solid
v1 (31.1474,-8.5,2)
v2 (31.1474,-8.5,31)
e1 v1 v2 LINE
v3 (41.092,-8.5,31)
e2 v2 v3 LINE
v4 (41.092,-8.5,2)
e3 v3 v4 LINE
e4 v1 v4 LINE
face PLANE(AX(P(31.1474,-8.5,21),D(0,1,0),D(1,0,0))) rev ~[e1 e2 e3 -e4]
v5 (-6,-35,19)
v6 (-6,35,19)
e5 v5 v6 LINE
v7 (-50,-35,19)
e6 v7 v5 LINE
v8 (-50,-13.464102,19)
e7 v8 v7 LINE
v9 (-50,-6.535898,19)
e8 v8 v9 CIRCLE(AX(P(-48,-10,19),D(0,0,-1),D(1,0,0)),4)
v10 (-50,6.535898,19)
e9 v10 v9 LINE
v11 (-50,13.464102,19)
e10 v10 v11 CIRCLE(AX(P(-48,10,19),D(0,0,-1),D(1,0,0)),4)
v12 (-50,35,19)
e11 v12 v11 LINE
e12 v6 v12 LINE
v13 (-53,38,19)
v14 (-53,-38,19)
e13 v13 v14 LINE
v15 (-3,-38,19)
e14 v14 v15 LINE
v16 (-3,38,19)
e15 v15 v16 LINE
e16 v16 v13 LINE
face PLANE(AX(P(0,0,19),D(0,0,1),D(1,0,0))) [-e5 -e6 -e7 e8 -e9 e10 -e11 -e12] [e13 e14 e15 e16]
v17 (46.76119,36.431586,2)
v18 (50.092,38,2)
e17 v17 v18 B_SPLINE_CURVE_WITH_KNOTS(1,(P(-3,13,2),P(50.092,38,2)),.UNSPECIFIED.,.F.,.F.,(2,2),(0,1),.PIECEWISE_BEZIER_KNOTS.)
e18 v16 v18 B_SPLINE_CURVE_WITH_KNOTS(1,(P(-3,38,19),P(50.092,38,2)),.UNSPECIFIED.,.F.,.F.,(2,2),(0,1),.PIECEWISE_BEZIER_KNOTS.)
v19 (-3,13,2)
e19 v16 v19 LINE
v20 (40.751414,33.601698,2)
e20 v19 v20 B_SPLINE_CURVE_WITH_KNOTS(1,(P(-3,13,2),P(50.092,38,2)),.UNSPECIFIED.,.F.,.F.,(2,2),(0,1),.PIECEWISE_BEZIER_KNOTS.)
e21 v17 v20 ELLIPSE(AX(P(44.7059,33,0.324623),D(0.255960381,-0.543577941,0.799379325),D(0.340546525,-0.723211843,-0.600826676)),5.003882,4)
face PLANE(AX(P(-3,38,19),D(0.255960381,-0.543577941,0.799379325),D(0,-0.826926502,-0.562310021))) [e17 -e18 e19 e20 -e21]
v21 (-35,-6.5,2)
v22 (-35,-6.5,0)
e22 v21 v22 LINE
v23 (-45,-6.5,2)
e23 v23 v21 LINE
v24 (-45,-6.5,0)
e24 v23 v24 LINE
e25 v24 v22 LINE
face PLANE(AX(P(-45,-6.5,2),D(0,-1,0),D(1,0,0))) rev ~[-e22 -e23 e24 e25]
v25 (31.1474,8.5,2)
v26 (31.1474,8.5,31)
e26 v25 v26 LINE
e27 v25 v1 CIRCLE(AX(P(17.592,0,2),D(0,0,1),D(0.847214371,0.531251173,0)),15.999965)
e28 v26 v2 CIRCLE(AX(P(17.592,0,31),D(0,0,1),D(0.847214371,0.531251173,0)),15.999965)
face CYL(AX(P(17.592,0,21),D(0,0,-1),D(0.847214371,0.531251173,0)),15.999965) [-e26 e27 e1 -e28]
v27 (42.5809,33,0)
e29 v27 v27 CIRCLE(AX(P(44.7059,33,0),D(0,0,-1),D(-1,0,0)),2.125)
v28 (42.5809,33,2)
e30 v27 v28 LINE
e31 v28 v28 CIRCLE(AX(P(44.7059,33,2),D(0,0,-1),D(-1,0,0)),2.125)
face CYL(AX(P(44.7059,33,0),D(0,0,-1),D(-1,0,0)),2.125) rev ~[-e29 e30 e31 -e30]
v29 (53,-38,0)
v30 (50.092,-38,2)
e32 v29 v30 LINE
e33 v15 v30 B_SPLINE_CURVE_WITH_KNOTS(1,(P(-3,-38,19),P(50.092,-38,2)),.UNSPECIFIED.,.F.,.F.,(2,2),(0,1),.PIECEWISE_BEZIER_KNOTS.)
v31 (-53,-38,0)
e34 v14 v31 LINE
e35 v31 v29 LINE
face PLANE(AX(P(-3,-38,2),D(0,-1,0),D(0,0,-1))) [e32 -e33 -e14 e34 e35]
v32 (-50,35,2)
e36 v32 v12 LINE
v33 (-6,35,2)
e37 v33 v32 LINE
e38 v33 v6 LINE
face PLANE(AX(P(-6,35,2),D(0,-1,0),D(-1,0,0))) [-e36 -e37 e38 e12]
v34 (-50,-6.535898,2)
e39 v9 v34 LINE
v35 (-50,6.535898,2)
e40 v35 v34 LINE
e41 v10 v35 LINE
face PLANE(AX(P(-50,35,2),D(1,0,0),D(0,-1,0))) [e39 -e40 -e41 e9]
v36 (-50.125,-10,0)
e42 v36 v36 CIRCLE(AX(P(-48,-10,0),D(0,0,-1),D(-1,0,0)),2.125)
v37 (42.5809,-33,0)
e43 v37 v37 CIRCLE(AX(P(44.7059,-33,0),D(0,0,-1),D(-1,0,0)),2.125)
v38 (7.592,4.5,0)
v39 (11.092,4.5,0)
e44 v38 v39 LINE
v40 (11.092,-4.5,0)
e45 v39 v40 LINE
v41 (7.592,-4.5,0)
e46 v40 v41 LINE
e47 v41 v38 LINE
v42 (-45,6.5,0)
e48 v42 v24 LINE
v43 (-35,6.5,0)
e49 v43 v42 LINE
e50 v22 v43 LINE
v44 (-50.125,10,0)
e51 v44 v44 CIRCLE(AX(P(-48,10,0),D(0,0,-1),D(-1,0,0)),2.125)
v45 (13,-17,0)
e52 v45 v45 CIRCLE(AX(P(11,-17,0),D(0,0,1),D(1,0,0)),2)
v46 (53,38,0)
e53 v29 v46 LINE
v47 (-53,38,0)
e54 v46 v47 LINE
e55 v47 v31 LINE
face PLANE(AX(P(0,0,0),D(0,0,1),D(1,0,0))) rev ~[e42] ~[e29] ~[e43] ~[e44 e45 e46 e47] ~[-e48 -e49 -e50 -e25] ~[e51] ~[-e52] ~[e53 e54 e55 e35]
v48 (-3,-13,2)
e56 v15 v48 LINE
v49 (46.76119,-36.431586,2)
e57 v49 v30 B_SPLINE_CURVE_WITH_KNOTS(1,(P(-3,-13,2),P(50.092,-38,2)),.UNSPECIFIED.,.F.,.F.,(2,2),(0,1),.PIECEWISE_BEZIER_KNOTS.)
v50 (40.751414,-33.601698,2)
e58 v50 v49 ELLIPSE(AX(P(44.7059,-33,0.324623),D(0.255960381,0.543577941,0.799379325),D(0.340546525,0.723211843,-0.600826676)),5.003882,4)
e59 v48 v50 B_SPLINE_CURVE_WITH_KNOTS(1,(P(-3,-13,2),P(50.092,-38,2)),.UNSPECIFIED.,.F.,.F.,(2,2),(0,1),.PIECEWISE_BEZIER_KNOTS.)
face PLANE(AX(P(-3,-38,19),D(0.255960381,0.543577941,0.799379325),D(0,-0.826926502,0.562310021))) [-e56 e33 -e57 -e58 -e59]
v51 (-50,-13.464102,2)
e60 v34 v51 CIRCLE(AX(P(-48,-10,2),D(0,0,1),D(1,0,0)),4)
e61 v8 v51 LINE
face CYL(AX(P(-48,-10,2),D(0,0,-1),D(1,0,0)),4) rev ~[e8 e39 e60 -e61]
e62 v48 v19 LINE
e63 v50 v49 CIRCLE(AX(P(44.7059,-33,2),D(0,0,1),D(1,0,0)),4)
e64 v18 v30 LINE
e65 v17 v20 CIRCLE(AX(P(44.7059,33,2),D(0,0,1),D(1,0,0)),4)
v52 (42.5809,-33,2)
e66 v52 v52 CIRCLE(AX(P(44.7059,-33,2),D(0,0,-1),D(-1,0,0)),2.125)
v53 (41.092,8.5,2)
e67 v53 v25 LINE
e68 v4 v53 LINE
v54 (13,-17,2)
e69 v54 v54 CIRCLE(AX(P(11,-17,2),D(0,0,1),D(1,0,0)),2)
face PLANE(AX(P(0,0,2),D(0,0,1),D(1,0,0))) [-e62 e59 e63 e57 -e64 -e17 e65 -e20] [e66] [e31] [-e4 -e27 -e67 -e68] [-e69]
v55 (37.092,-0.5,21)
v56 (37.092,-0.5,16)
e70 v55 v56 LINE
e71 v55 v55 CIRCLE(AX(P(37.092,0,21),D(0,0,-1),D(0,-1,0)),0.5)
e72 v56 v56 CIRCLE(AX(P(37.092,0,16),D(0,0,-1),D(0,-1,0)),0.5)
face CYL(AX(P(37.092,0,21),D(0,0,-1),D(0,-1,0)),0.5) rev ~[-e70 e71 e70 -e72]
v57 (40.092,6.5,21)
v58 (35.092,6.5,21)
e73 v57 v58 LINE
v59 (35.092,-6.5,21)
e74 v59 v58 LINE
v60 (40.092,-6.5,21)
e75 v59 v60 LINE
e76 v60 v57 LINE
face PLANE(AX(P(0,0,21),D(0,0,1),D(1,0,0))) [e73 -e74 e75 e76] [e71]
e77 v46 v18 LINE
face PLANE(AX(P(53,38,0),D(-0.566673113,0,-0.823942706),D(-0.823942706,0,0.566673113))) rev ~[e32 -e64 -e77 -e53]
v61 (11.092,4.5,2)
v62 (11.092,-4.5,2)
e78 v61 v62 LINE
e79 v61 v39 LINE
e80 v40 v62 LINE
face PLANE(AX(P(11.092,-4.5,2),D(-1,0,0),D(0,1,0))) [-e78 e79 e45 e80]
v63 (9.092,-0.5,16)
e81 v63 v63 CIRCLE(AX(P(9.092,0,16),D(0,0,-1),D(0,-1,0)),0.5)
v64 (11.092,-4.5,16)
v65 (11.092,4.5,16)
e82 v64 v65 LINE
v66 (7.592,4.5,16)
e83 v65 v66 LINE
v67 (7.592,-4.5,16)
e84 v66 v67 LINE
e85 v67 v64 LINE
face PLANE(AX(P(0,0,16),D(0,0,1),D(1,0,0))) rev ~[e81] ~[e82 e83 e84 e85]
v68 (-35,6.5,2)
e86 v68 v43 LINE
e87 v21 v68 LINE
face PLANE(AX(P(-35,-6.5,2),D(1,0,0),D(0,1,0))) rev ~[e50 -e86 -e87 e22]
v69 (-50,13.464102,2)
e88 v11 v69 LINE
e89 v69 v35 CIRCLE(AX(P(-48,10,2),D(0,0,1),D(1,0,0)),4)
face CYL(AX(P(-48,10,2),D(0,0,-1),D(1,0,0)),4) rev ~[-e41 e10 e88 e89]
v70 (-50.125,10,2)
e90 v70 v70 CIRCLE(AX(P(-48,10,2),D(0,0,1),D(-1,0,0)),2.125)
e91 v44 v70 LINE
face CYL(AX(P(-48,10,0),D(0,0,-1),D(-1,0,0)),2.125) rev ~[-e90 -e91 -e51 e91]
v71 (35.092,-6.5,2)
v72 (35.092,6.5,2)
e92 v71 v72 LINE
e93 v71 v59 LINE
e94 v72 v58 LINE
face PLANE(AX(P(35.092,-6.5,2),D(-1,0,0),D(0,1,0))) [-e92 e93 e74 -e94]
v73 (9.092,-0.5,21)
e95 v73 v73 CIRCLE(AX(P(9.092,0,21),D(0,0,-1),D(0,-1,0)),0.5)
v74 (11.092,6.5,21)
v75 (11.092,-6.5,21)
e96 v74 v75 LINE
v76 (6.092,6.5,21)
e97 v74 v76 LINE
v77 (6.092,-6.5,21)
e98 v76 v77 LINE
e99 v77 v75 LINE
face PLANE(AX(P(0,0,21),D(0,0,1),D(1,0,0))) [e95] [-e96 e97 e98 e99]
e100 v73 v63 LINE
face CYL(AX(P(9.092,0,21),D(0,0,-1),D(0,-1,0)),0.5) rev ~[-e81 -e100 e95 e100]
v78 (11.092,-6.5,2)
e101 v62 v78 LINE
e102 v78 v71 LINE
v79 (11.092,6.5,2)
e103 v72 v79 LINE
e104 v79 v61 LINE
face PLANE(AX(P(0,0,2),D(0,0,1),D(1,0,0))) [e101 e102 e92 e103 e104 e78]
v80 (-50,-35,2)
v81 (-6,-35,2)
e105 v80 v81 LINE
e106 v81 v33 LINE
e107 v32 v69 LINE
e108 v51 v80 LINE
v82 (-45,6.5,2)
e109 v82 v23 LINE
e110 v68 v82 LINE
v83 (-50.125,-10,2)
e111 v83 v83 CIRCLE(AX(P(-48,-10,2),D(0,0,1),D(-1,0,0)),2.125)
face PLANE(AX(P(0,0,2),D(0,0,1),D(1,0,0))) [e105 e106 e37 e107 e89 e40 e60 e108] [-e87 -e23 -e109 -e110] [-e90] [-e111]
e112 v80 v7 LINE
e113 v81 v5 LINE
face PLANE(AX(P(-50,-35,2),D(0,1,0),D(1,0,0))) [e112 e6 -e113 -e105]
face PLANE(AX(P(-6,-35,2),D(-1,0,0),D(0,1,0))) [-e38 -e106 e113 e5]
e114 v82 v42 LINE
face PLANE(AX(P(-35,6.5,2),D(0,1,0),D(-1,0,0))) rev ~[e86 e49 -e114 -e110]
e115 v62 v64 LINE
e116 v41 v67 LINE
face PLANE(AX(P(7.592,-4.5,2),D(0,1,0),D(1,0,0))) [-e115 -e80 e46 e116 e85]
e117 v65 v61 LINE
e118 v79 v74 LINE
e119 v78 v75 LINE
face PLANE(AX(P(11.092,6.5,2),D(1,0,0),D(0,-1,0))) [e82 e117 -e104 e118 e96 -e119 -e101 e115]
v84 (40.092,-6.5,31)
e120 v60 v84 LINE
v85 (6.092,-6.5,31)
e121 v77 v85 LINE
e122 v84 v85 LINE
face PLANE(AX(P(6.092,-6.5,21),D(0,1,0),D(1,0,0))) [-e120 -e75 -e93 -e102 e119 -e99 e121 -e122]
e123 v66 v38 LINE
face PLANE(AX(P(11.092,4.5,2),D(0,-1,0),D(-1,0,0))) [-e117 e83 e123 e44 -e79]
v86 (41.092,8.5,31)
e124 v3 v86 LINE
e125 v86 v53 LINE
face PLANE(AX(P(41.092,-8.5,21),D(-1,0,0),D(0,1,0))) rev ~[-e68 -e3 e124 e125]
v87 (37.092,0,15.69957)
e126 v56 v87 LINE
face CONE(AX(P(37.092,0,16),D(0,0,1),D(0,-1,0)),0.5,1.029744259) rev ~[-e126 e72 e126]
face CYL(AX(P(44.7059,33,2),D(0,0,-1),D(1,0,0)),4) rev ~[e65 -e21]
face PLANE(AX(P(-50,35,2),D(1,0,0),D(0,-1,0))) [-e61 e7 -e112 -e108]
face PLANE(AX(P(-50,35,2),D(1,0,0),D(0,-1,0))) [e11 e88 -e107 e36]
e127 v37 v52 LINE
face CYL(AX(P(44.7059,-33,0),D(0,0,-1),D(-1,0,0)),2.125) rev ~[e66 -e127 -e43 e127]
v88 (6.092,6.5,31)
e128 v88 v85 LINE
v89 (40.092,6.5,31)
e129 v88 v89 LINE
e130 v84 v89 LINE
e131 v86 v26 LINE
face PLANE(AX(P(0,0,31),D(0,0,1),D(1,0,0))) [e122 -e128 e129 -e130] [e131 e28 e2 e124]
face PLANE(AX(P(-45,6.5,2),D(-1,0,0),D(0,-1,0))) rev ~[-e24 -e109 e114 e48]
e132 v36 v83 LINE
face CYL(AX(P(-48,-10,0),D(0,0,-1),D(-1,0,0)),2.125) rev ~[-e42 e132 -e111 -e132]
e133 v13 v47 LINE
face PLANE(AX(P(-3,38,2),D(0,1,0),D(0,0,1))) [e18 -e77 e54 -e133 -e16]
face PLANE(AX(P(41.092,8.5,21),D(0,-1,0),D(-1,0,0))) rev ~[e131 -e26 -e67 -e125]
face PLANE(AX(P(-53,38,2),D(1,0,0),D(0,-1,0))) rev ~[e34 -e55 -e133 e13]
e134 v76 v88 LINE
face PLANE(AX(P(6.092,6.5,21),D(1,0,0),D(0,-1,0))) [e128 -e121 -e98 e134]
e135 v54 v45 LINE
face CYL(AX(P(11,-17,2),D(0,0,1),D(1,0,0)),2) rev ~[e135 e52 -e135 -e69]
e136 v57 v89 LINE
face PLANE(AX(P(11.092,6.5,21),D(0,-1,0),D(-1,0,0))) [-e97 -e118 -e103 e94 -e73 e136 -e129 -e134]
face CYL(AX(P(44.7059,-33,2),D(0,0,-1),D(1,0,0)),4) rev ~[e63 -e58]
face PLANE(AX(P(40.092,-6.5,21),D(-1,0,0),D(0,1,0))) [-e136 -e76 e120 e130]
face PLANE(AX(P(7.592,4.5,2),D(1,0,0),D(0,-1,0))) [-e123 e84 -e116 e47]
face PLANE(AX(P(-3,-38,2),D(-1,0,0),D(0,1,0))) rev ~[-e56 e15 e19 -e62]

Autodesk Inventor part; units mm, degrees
ref_plane "YZ Plane" through (0, 0, 0) normal (1, 0, 0) x (0, 1, 0)
ref_plane "XZ Plane" through (0, 0, 0) normal (0, 1, 0) x (-1, 0, 0)
sketch "Sketch1" plane through (0, 0, 0) normal (0, 0, 1) x (1, 0, 0)
  line L0 (47.7059, -35) -> (-50, -35) projected
  line L1 (-50, -35) -> (-50, 35) projected
  line L2 (-50, 35) -> (47.7059, 35) projected
  line L3 (47.7059, 35) -> (47.7059, -35) projected
  line L4 (53, -38) -> (53, 38) projected
  line L5 (53, 38) -> (-53, 38) projected
  line L6 (-53, 38) -> (-53, -38) projected
  line L7 (-53, -38) -> (53, -38) projected
  point P0 (0, 0)
extrude "Extrusion1" add sketch "Sketch1" along normal blind 2 contours L0 L1 L2 L3 | L7 L6 L5 L4
sketch "Sketch2" plane through (-53, 38, 0) normal (0, 1, 0) x (1, 0, 0)
  line L0 (106, 0) -> (130.7184, 17) projected
  line L1 (106, 0) -> (106, -2) projected
  line L2 (106, 0) -> (103.092, -2)
  line L3 (106, -2) -> (0, -2) projected
  line L4 (103.092, -2) -> (106, -2)
  point P0 (53, 0)
extrude "Extrusion2" cut sketch "Sketch2" against normal through all
sketch "Sketch3" plane through (0, 0, 2) normal (0, 0, 1) x (1, 0, 0)
  line L0 (50.092, -38) -> (50.092, 38) projected
  line L1 (50.092, 38) -> (-53, 38) projected
  line L2 (-53, 38) -> (-53, -38) projected
  line L3 (-53, -38) -> (50.092, -38) projected
  line L4 (-53, -38) -> (-3, -38)
  line L5 (-3, -38) -> (-3, 38)
  line L6 (-3, 38) -> (-53, 38)
  line L7 (-53, 38) -> (-53, -38)
  line L8 (-53, 38) -> (-53, -38) projected
  line L9 (-53, -38) -> (50.092, -38) projected
  line L10 (50.092, 38) -> (-53, 38) projected
  line L11 (-50, -35) -> (-6, -35)
  line L12 (-6, -35) -> (-6, 35)
  line L13 (-6, 35) -> (-50, 35)
  line L14 (-50, 35) -> (-50, -35)
  point P0 (0, 0)
  dimension "d4" = 50
  dimension "d5" = 3
  dimension "d6" = 3
  dimension "d7" = 3
  dimension "d8" = 3
extrude "Extrusion3" add sketch "Sketch3" along normal blind 17 contours L3 L2 L1 L5
sketch3d "3D Sketch1"
sketch "Sketch4" plane through (-3, -38, 2) normal (1, 0, 0) x (0, 0, -1)
  line L0 (0, 76) -> (0, 0) projected
  line L1 (0, 76) -> (-17, 76) projected
  line L2 (-17, 0) -> (-17, 76) projected
  line L3 (0, 0) -> (-17, 0) projected
  line L4 (-17, 0) -> (-17, 76) projected
  line L5 (-17, 0) -> (0, 25)
  line L6 (0, 3) -> (0, 73) projected
  line L7 (-17, 76) -> (0, 51)
  point P0 (2, 38)
  dimension "d11" = 25
  dimension "d12" = 25
loft "Loft1" add profiles "Sketch4" section 2 point at (50.092, -38, 2) contours L5 L0 L3
loft "Loft2" add profiles "Sketch4" section 2 point at (50.092, 38, 2) contours L0 L7 L1
sketch "Sketch6" plane through (0, 0, 2) normal (0, 0, 1) x (1, 0, 0)
  line L0 (11.092, -6.5) -> (35.092, -6.5)
  line L1 (35.092, -6.5) -> (35.092, 6.5)
  line L2 (35.092, 6.5) -> (11.092, 6.5)
  line L3 (11.092, 6.5) -> (11.092, -6.5)
  line L4 (50.092, -38) -> (50.092, 38) construction
  line L5 (50.092, 38) -> (35.092, 6.5) construction
  line L6 (50.092, -38) -> (35.092, -6.5) construction
  line L7 (11.092, -6.5) -> (35.092, 6.5) construction
  line L8 (11.092, 6.5) -> (35.092, -6.5) construction
  line L9 (5.092, -8.5) -> (41.092, -8.5)
  line L10 (41.092, -8.5) -> (41.092, 8.5)
  line L11 (41.092, 8.5) -> (5.092, 8.5)
  line L12 (5.092, 8.5) -> (5.092, -8.5)
  point P0 (0, 0)
  point P1 (23.092, 0)
  dimension "d25" = 24
  dimension "d26" = 13
  dimension "d27" = 15
  dimension "d31" = 6
  dimension "d32" = 6
  dimension "d33" = 2
  dimension "d34" = 2
extrude "Extrusion5" add sketch "Sketch6" along normal blind 19
sketch "Sketch7" plane through (0, 0, 2) normal (0, 0, 1) x (1, 0, 0)
  circle A0 centre (17.592, 0) radius 0.6 projected
  arc A1 (31.1474, 8.5) -> (31.1474, -8.5) centre (17.592, 0) ccw
  line L0 (31.1474, -8.5) -> (5.092, -8.5)
  line L1 (5.092, -8.5) -> (5.092, 8.5)
  line L2 (5.092, 8.5) -> (31.1474, 8.5)
  line L3 (5.092, -8.5) -> (5.092, 8.5) projected
  line L4 (41.092, -8.5) -> (5.092, -8.5) projected
  line L5 (5.092, 8.5) -> (41.092, 8.5) projected
  point P0 (0, 0)
  dimension "d35" = 32
extrude "Extrusion6" add sketch "Sketch7" along normal blind 19 contours L2 L1 L0 A1
sketch "Sketch8" plane through (0, 0, 21) normal (0, 0, 1) x (1, 0, 0)
  line L0 (6.592, -1.125) -> (6.592, -6.2) projected
  line L1 (6.592, 6.2) -> (6.592, 1.125) projected
  line L2 (11.092, 6.5) -> (35.092, 6.5) projected
  line L3 (35.092, -6.5) -> (11.092, -6.5) projected
  line L4 (39.592, 6.2) -> (39.592, 1.125) projected
  line L5 (39.592, -1.125) -> (39.592, -6.2) projected
  line L6 (6.092, -6.5) -> (40.092, -6.5)
  line L7 (40.092, -6.5) -> (40.092, 6.5)
  line L8 (40.092, 6.5) -> (6.092, 6.5)
  line L9 (6.092, 6.5) -> (6.092, -6.5)
  arc A0 (31.1474, 8.5) -> (31.1474, -8.5) centre (17.592, 0) ccw projected
  line L10 (31.1474, -8.5) -> (41.092, -8.5) projected
  line L11 (41.092, 8.5) -> (31.1474, 8.5) projected
  line L12 (41.092, -8.5) -> (41.092, 8.5) projected
  point P0 (0, 0)
  dimension "d38" = 0.5
  dimension "d39" = 0.5
ref_plane "Work Plane1" through (12.092, -5.5, 31) normal (0, 0, 1) x (1, 0, 0)
extrude "Extrusion7" add sketch "Sketch8" along normal up to surface (10 mm away)
sketch "Sketch9" plane through (0, 0, 21) normal (0, 0, 1) x (1, 0, 0)
  arc A0 (8.4305, -0.75) -> (8.4305, 0.75) centre (9.092, 0) ccw projected
  arc A1 (37.7534, 0.75) -> (37.7534, -0.75) centre (37.092, 0) ccw projected
  point P0 (0, 0)
hole "Hole1" at (9.092, 0, 21) at (37.092, 0, 21) direction (0, 0, -1) diameter 1 depth 5 tip angle 118
sketch "Sketch10" plane through (0, 0, 2) normal (0, 0, 1) x (1, 0, 0)
  line L0 (7.592, -4.5) -> (11.092, -4.5)
  line L1 (11.092, -4.5) -> (11.092, 4.5)
  line L2 (11.092, 4.5) -> (7.592, 4.5)
  line L3 (7.592, 4.5) -> (7.592, -4.5)
  line L4 (11.092, 6.5) -> (11.092, -6.5) projected
  line L5 (35.092, 6.5) -> (11.092, 6.5) construction
  line L6 (11.092, 6.5) -> (7.592, 4.5) construction
  line L7 (7.592, -4.5) -> (11.092, -6.5) construction
  point P0 (0, 0)
  dimension "d49" = 3.5
  dimension "d50" = 9
extrude "Extrusion8" cut sketch "Sketch10" along normal blind 14 and the other way blind 3
sketch "Sketch11" plane through (0, 0, 0) normal (0, 0, -1) x (-1, 0, 0)
  circle A0 centre (-44.7059, -33) radius 2.125 projected
  circle A1 centre (-44.7059, 33) radius 2.125 projected
  circle A2 centre (48, -10) radius 2.125 projected
  circle A3 centre (48, 10) radius 2.125 projected
  point P0 (0, 0)
extrude "Extrusion9" cut sketch "Sketch11" against normal through all
sketch "Sketch12" plane through (0, 0, 2) normal (0, 0, 1) x (1, 0, 0)
  circle A0 centre (44.7059, -33) radius 2.125 projected
  circle A1 centre (44.7059, 33) radius 2.125 projected
  arc A2 (-50, -10.7181) -> (-50, -9.2819) centre (-48, -10) ccw projected
  arc A3 (-50, 9.2819) -> (-50, 10.7181) centre (-48, 10) ccw projected
  circle A4 centre (44.7059, -33) radius 4
  circle A5 centre (44.7059, 33) radius 4
  circle A6 centre (-48, -10) radius 2.125 projected
  circle A7 centre (-48, -10) radius 4
  circle A8 centre (-48, 10) radius 2.125 projected
  circle A9 centre (-48, 10) radius 4
  point P0 (0, 0)
  dimension "d57" = 8
  dimension "d58" = 8
  dimension "d59" = 8
  dimension "d60" = 8
extrude "Extrusion10" cut sketch "Sketch12" along normal through all contours A0 | A1 | A6 A2 | A8 A3 | A4 | A5 | A7 | A9
sketch "Sketch15" plane through (0, 0, 2) normal (0, 0, 1) x (1, 0, 0)
  line L0 (-45, -6.5) -> (-35, -6.5)
  line L1 (-35, -6.5) -> (-35, 6.5)
  line L2 (-35, 6.5) -> (-45, 6.5)
  line L3 (-45, 6.5) -> (-45, -6.5)
  line L4 (-50, -35) -> (-50, -13.4641) construction
  line L5 (-50, -35) -> (-45, -6.5) construction
  line L6 (-50, 35) -> (-6, 35) construction
  line L7 (-45, 6.5) -> (-50, 35) construction
  line L8 (-50, -6.5359) -> (-50, 6.5359) construction
  circle A0 centre (11, -17) radius 2
  line L9 (-3, -38) -> (-3, 38) projected
  line L10 (-3, -38) -> (50.092, -38) projected
  point P0 (0, 0)
  dimension "d73" = 10
  dimension "d74" = 13
  dimension "d75" = 5
  dimension "d76" = 4
  dimension "d77" = 14
  dimension "d78" = 21
extrude "Extrusion12" cut sketch "Sketch15" against normal through all
equation "\"d6\" = d5"
equation "\"d7\" = d5"
equation "\"d8\" = d5"
equation "\"d12\" = d11"
equation "\"d32\" = d31"
equation "\"d34\" = d33"
equation "\"d39\" = d38"
properties part number "cover" material "Ogólne"
